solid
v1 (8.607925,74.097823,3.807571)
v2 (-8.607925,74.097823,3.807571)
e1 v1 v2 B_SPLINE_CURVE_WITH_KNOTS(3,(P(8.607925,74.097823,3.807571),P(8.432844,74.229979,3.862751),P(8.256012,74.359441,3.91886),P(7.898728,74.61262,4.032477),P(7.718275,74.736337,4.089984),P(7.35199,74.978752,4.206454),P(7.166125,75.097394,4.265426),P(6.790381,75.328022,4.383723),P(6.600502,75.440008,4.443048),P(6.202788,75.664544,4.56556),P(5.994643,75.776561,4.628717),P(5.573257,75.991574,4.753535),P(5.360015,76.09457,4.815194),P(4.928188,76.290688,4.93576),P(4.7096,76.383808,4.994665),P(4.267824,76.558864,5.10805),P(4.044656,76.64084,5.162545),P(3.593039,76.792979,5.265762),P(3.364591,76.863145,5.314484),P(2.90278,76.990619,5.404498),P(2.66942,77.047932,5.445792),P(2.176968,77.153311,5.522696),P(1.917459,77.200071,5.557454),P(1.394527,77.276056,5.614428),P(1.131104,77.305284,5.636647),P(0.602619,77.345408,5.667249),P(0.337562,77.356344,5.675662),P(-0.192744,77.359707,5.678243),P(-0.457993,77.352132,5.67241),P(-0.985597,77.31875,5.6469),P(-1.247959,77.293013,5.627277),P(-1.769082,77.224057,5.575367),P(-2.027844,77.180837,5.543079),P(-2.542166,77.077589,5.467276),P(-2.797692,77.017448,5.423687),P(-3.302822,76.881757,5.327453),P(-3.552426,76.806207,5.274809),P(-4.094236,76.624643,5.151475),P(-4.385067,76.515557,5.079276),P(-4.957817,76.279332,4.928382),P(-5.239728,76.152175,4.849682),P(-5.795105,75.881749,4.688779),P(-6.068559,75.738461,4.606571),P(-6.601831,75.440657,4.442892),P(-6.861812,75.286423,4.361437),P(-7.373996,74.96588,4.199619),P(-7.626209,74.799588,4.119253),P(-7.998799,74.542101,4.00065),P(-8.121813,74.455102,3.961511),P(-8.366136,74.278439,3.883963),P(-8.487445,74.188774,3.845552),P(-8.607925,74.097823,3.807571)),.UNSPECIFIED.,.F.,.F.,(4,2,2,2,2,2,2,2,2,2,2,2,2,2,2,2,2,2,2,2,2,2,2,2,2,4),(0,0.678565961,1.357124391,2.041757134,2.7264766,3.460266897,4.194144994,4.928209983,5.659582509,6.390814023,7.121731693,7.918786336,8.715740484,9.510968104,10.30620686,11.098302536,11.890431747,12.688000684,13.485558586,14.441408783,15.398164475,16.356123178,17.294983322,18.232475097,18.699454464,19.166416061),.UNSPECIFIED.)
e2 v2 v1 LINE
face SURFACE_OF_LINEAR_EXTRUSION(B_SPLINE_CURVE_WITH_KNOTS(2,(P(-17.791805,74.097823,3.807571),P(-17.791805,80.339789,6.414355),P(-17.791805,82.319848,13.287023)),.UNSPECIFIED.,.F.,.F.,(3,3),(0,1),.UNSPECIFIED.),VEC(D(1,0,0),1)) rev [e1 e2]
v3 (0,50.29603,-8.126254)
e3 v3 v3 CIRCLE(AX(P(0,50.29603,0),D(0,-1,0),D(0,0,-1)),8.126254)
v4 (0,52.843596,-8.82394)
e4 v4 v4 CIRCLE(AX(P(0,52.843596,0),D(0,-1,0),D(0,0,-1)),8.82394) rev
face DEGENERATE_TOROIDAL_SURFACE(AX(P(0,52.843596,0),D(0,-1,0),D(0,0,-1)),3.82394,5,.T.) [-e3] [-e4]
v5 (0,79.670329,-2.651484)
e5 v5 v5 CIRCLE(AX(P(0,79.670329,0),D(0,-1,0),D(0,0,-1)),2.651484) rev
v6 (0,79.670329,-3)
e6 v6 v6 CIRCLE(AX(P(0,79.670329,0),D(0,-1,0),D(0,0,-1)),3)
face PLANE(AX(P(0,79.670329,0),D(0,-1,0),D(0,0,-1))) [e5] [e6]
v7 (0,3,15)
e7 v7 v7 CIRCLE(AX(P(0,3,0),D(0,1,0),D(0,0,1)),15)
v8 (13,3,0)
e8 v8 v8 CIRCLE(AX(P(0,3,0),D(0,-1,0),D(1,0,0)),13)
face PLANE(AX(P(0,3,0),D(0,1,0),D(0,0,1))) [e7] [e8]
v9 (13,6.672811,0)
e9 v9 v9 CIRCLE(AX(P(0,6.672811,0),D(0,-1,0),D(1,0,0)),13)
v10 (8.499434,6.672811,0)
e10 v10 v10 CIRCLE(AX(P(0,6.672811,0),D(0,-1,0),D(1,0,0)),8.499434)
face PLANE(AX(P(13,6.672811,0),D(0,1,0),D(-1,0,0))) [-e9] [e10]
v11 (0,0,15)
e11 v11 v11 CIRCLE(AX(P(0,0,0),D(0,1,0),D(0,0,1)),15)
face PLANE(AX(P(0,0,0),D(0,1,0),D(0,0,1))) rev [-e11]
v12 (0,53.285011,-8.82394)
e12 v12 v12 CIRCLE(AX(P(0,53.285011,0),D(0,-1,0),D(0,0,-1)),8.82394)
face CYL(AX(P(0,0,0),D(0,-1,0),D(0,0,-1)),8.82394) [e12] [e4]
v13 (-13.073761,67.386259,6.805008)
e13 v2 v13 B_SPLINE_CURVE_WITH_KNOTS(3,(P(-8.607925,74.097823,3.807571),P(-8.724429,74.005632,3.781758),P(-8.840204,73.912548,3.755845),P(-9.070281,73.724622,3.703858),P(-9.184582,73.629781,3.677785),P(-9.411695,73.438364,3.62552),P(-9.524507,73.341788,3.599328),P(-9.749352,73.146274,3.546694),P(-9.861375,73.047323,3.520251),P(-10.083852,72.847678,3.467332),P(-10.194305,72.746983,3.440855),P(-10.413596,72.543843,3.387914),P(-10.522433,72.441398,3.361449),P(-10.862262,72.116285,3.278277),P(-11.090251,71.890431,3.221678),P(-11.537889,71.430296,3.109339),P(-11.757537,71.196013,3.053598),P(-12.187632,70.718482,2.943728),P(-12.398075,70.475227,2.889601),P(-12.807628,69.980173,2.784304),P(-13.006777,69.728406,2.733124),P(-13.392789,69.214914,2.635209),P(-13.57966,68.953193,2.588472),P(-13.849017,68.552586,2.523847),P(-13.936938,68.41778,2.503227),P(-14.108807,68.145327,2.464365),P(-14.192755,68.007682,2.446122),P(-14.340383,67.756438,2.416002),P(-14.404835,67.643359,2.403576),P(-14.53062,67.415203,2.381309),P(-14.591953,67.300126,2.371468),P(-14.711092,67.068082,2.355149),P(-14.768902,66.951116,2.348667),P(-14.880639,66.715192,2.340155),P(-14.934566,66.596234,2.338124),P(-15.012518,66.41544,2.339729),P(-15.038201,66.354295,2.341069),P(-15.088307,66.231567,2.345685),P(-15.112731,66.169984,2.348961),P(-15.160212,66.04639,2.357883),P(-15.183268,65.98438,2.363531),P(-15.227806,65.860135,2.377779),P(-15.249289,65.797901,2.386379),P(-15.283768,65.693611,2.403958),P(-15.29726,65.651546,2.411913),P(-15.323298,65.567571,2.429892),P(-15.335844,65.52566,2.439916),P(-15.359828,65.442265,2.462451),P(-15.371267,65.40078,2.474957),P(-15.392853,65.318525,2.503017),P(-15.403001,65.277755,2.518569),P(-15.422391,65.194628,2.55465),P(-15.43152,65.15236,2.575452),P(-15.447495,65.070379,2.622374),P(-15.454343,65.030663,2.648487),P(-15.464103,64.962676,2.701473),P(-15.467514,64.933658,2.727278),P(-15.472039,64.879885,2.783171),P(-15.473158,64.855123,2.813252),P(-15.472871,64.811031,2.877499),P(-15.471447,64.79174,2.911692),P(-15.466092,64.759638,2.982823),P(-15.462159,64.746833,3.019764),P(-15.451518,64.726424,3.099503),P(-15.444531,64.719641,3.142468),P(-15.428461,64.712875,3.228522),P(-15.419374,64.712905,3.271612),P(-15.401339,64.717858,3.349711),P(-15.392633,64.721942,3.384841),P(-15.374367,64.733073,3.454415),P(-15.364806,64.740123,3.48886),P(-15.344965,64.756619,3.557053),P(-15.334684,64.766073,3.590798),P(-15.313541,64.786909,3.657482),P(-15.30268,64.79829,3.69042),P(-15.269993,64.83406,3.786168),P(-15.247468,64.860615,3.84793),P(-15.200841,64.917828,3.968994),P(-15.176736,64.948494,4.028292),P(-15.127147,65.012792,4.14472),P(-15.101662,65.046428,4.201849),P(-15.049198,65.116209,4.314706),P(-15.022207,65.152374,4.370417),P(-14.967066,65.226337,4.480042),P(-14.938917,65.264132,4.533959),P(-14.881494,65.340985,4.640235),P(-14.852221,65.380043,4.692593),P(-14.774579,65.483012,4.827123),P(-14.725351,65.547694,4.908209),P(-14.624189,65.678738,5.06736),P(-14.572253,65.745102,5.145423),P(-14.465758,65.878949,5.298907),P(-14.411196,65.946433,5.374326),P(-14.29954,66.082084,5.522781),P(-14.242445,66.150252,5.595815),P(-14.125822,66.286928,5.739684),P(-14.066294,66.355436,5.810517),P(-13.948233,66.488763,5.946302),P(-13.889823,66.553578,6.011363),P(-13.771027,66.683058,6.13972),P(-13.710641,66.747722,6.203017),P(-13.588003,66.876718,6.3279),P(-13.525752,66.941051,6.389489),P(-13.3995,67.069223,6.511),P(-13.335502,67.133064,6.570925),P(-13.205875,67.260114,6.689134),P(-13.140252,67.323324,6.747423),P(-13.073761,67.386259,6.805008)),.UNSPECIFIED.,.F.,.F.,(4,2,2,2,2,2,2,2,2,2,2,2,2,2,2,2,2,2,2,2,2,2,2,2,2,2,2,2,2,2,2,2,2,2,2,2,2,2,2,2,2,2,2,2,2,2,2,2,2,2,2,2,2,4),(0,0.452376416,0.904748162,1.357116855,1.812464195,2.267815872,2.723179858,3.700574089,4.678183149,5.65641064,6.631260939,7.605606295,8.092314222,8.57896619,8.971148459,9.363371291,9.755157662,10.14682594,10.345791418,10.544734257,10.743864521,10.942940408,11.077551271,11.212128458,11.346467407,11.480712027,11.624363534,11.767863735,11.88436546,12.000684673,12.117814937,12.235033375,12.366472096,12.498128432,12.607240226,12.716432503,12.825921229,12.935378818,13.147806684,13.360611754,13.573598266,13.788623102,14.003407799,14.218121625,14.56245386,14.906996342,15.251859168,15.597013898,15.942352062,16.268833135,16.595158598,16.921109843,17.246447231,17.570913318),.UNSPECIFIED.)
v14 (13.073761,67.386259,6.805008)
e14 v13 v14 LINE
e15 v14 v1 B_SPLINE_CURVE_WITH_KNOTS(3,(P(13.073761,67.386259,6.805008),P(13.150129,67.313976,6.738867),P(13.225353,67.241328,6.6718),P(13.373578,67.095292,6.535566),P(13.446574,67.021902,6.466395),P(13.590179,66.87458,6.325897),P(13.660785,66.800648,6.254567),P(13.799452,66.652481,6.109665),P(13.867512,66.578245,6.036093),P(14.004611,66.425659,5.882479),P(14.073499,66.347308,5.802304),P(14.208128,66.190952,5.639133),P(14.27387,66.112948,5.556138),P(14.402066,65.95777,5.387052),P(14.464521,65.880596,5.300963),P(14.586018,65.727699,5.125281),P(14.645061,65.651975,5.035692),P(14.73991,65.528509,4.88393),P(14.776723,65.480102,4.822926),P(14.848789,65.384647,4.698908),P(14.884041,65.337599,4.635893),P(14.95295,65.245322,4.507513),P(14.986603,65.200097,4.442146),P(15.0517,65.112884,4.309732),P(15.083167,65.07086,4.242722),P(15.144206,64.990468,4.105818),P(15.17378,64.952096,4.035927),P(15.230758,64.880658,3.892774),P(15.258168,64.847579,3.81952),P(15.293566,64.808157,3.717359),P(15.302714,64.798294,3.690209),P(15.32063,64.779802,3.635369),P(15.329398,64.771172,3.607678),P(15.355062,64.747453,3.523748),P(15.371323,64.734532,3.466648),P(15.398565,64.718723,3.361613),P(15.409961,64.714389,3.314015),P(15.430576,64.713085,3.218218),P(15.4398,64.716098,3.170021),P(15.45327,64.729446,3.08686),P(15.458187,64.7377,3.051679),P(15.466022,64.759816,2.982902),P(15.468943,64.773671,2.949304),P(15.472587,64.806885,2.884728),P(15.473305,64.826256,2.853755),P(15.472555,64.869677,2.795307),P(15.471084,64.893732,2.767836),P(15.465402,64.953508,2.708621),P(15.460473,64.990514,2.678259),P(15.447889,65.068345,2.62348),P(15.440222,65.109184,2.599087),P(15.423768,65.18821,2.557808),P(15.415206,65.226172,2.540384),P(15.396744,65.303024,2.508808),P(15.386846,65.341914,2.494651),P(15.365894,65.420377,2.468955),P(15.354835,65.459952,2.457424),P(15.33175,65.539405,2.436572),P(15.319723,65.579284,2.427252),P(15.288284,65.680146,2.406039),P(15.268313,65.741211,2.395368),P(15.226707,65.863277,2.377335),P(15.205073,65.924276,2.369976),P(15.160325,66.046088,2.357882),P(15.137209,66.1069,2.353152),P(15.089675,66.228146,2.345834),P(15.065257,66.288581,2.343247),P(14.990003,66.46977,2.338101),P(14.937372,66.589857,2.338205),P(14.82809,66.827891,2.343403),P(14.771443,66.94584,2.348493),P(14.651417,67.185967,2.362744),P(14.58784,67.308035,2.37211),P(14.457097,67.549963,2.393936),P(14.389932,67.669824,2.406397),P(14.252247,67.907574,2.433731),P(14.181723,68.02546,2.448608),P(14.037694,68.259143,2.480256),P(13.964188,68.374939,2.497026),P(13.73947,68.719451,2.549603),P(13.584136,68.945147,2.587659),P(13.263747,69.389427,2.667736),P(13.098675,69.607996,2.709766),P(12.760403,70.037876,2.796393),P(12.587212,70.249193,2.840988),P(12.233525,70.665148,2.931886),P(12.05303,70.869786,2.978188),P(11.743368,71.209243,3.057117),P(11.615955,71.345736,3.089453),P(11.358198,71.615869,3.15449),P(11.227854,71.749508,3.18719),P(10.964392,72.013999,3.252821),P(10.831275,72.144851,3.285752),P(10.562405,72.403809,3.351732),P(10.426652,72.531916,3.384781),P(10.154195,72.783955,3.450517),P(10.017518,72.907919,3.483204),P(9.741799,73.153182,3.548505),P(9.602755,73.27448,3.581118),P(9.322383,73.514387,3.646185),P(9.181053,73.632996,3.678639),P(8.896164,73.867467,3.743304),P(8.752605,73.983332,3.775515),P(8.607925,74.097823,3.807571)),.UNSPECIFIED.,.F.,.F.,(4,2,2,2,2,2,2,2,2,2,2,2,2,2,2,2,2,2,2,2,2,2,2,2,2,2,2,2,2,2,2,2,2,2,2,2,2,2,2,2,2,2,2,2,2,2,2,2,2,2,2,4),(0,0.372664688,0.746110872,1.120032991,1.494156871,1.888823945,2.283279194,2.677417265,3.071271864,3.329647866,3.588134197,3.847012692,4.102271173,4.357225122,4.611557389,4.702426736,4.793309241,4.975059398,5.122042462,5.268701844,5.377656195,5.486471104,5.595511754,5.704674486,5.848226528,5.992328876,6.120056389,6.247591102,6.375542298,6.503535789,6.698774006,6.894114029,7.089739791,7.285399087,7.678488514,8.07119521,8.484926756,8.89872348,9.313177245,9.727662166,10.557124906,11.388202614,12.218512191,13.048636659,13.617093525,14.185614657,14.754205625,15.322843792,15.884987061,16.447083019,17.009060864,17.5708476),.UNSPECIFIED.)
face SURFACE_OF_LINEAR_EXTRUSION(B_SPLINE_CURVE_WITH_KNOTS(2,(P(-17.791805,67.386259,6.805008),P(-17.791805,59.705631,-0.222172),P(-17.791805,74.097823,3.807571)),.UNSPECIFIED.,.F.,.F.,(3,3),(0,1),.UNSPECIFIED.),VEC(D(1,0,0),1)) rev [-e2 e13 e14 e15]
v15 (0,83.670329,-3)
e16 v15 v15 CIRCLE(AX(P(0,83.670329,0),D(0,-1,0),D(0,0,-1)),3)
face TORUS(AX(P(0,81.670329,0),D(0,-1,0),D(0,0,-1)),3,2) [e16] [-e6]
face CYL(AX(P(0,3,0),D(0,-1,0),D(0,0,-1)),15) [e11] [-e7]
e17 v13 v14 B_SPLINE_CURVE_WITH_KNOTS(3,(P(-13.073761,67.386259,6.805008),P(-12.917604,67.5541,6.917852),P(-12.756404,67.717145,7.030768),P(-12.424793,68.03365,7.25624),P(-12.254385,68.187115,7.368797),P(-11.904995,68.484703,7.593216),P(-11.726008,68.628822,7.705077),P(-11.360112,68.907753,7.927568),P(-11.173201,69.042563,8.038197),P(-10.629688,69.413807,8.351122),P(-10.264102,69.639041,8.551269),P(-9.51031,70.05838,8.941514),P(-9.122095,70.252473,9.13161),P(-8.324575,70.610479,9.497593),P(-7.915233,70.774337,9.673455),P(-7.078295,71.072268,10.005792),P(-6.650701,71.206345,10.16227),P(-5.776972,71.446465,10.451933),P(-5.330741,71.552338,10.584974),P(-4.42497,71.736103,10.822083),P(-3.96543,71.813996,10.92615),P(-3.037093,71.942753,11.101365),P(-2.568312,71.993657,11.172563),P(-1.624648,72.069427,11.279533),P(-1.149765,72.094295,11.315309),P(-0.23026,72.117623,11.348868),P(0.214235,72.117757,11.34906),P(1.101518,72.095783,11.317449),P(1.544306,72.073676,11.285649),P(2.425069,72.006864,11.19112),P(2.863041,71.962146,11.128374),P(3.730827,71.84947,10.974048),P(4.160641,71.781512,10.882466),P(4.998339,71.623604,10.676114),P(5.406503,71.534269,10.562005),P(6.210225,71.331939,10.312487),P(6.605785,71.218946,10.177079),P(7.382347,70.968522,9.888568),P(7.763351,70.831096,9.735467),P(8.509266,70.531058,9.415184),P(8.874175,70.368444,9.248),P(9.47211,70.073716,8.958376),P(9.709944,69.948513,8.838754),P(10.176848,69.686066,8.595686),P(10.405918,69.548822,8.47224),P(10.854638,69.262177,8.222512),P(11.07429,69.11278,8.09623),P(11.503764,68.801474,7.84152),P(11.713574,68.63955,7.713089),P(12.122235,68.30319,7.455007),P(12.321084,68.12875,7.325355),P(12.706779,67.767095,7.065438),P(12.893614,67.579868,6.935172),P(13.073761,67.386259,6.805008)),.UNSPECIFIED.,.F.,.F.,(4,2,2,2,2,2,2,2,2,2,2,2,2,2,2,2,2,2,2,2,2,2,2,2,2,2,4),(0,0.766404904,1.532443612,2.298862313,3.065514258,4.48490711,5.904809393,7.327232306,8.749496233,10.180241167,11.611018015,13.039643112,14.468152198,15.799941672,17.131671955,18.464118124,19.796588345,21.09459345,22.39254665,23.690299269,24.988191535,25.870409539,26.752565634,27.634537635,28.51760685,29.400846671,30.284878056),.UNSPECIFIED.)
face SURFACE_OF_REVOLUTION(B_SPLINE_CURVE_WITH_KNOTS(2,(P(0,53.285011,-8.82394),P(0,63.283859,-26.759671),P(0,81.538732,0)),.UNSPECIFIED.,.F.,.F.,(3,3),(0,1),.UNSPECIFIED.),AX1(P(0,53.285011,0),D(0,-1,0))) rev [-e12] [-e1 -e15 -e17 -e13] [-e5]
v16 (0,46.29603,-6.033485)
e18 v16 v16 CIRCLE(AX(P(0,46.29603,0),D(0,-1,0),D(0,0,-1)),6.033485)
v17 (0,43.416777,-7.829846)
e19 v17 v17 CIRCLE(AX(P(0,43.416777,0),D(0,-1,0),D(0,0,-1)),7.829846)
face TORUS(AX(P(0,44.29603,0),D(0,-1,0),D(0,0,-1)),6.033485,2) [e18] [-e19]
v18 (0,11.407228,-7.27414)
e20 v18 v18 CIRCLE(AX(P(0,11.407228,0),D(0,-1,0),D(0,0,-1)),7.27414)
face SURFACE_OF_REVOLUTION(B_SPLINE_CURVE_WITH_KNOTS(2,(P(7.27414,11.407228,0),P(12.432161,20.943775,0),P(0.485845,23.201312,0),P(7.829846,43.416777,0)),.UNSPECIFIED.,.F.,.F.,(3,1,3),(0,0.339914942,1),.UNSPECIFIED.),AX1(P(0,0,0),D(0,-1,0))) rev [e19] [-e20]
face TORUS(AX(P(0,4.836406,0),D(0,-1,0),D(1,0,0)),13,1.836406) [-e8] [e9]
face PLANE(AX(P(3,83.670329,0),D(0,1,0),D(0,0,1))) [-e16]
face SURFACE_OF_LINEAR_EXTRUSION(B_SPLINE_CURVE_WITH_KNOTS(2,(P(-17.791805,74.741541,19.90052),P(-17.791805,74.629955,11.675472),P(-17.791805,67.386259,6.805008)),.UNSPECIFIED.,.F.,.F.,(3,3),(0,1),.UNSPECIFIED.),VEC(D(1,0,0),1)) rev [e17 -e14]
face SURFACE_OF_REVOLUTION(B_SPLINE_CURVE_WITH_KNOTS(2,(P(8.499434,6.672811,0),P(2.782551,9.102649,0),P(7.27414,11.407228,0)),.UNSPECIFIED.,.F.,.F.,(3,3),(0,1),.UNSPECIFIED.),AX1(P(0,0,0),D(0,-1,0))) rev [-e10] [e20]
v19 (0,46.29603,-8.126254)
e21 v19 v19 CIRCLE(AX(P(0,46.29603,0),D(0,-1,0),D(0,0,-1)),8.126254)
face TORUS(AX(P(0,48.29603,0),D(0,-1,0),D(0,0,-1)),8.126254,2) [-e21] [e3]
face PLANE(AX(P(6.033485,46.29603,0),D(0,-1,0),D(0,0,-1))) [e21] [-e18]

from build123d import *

# Parameters (mm, degrees)
SKETCH1_R               = 15
BOSS_EXTRUDE1_DEPTH     = 3
CUT_EXTRUDE1_DEPTH      = 85.628193936
CUT_EXTRUDE1_DEPTH_BACK = 85.628193936
FILLET1_R               = 5


with BuildPart() as part:
    # Sketch1 → Boss-Extrude1 (new body)
    with BuildSketch(Plane(origin=(0, 0, 0), x_dir=(1, 0, 0), z_dir=(0, 1, 0))):
        with Locations(Location((0, 0, 0), (0, 0, 270))):
            Circle(SKETCH1_R)
    extrude(amount=BOSS_EXTRUDE1_DEPTH)

    # Sketch2 → Revolve1 (revolve)
    with BuildSketch(Plane.XY):
        with BuildLine():
            Line((13, 3), (0, 3))
            Line((0, 3), (0, 11.407227642))
            Line((0, 11.407227642), (7.274140372, 11.407227642))
            add(Edge.make_bspline(
                [(8.499433611, 6.672811029), (2.782551189, 9.102648565), (7.274140372, 11.407227642)],
                knots=[0, 0, 0, 1, 1, 1], degree=2))
            Line((8.499433611, 6.672811029), (13, 6.672811029))
            ThreePointArc((13, 6.672811029), (14.836405515, 4.836405515), (13, 3))
        make_face()
    revolve(axis=Axis((0, 0, 0), (0, 1, 0)))

    # Sketch3 → Revolve2 (revolve)
    with BuildSketch(Plane.XY, mode=Mode.PRIVATE) as revolve2_sk:
        with BuildLine():
            Line((7.274140372, 11.407227642), (0, 11.407227642))
            Line((0, 11.407227642), (0, 53.285011329))
            Line((0, 53.285011329), (8.823939623, 53.285011329))
            Line((8.823939623, 53.285011329), (8.823939623, 50.296030031))
            Line((8.823939623, 50.296030031), (8.126253909, 50.296030031))
            ThreePointArc((8.126253909, 50.296030031), (10.126253909, 48.296030031), (8.126253909, 46.296030031))
            Line((8.126253909, 46.296030031), (6.033484578, 46.296030031))
            ThreePointArc((6.033484578, 46.296030031), (7.730320881, 45.354683213), (7.82984573, 43.416776591))
            add(Edge.make_bspline(
                [(7.82984573, 43.416776591), (0.485845428, 23.201312227), (12.432161101, 20.943774518), (7.274140372, 11.407227642)],
                knots=[0, 0, 0, 0.660085058, 1, 1, 1], degree=2))
        make_face()
    revolve(revolve2_sk.sketch.rotate(Axis((0, 0, 0), (0, 1, 0)), 90), axis=Axis((0, 0, 0), (0, 1, 0)))

    # Sketch4 → Revolve3 (revolve)
    with BuildSketch(Plane(origin=(0, 0, 0), x_dir=(0, 0, -1), z_dir=(1, 0, 0))):
        with BuildLine():
            Line((0, 53.285011329), (8.823939623, 53.285011329))
            add(Edge.make_bspline(
                [(0, 81.538732353), (26.759670813, 63.283858911), (8.823939623, 53.285011329)],
                knots=[0, 0, 0, 1, 1, 1], degree=2))
            Line((0, 81.538732353), (0, 53.285011329))
        make_face()
    revolve(axis=Axis((0, 53.285011329, 0), (0, 1, 0)))

    # Sketch5 → Cut-Extrude1 (cut, two sides: drawn at the far end of the back side and taken through both)
    with BuildSketch(Plane(origin=(0, 0, 0), x_dir=(0, 0, -1), z_dir=(1, 0, 0)).offset(-CUT_EXTRUDE1_DEPTH_BACK)):
        with BuildLine():
            Line((-19.900519696, 74.741541411), (-13.28702278, 82.319848293))
            add(Edge.make_bspline(
                [(-13.28702278, 82.319848293), (-6.414355472, 80.339788966), (-3.807570693, 74.097823451)],
                knots=[0, 0, 0, 1, 1, 1], degree=2))
            add(Edge.make_bspline(
                [(-6.805007666, 67.386258827), (0.222172111, 59.705631), (-3.807570693, 74.097823451)],
                knots=[0, 0, 0, 1, 1, 1], degree=2))
            add(Edge.make_bspline(
                [(-19.900519696, 74.741541411), (-11.675471636, 74.629954599), (-6.805007666, 67.386258827)],
                knots=[0, 0, 0, 1, 1, 1], degree=2))
        make_face()
    extrude(amount=CUT_EXTRUDE1_DEPTH + CUT_EXTRUDE1_DEPTH_BACK, mode=Mode.SUBTRACT)

    # Fillet1
    # the kernel refuses this fillet: 5 mm, written as the material it takes off along each edge
    with BuildSketch(Plane(origin=(0, 50.296030031, 0), x_dir=(0, 0, -1), z_dir=(1, 0, 0))) as fillet1_piece_1:
        with BuildLine():
            CenterArc((3.823939623, 2.547565856), FILLET1_R, 329.368592235, 30.631407765)
            Line((8.823939623, 2.547565856), (8.823939623, 0))
            Line((8.823939623, 0), (8.126253909, 0))
        make_face()
    revolve(axis=Axis((0, 50.296030031, 0), (0, 1, 0)), mode=Mode.SUBTRACT)

    # Sketch6 → Revolve4 (revolve)
    with BuildSketch(Plane.XY, mode=Mode.PRIVATE) as revolve4_sk:
        with BuildLine():
            Line((0, 79.670328894), (3, 79.670328894))
            ThreePointArc((3, 79.670328894), (5, 81.670328894), (3, 83.670328894))
            Line((3, 83.670328894), (0, 83.670328894))
            Line((0, 83.670328894), (0, 79.670328894))
        make_face()
    revolve(revolve4_sk.sketch.rotate(Axis((0, 0, 0), (0, 1, 0)), 90), axis=Axis((0, 0, 0), (0, 1, 0)))


solid = part.part
